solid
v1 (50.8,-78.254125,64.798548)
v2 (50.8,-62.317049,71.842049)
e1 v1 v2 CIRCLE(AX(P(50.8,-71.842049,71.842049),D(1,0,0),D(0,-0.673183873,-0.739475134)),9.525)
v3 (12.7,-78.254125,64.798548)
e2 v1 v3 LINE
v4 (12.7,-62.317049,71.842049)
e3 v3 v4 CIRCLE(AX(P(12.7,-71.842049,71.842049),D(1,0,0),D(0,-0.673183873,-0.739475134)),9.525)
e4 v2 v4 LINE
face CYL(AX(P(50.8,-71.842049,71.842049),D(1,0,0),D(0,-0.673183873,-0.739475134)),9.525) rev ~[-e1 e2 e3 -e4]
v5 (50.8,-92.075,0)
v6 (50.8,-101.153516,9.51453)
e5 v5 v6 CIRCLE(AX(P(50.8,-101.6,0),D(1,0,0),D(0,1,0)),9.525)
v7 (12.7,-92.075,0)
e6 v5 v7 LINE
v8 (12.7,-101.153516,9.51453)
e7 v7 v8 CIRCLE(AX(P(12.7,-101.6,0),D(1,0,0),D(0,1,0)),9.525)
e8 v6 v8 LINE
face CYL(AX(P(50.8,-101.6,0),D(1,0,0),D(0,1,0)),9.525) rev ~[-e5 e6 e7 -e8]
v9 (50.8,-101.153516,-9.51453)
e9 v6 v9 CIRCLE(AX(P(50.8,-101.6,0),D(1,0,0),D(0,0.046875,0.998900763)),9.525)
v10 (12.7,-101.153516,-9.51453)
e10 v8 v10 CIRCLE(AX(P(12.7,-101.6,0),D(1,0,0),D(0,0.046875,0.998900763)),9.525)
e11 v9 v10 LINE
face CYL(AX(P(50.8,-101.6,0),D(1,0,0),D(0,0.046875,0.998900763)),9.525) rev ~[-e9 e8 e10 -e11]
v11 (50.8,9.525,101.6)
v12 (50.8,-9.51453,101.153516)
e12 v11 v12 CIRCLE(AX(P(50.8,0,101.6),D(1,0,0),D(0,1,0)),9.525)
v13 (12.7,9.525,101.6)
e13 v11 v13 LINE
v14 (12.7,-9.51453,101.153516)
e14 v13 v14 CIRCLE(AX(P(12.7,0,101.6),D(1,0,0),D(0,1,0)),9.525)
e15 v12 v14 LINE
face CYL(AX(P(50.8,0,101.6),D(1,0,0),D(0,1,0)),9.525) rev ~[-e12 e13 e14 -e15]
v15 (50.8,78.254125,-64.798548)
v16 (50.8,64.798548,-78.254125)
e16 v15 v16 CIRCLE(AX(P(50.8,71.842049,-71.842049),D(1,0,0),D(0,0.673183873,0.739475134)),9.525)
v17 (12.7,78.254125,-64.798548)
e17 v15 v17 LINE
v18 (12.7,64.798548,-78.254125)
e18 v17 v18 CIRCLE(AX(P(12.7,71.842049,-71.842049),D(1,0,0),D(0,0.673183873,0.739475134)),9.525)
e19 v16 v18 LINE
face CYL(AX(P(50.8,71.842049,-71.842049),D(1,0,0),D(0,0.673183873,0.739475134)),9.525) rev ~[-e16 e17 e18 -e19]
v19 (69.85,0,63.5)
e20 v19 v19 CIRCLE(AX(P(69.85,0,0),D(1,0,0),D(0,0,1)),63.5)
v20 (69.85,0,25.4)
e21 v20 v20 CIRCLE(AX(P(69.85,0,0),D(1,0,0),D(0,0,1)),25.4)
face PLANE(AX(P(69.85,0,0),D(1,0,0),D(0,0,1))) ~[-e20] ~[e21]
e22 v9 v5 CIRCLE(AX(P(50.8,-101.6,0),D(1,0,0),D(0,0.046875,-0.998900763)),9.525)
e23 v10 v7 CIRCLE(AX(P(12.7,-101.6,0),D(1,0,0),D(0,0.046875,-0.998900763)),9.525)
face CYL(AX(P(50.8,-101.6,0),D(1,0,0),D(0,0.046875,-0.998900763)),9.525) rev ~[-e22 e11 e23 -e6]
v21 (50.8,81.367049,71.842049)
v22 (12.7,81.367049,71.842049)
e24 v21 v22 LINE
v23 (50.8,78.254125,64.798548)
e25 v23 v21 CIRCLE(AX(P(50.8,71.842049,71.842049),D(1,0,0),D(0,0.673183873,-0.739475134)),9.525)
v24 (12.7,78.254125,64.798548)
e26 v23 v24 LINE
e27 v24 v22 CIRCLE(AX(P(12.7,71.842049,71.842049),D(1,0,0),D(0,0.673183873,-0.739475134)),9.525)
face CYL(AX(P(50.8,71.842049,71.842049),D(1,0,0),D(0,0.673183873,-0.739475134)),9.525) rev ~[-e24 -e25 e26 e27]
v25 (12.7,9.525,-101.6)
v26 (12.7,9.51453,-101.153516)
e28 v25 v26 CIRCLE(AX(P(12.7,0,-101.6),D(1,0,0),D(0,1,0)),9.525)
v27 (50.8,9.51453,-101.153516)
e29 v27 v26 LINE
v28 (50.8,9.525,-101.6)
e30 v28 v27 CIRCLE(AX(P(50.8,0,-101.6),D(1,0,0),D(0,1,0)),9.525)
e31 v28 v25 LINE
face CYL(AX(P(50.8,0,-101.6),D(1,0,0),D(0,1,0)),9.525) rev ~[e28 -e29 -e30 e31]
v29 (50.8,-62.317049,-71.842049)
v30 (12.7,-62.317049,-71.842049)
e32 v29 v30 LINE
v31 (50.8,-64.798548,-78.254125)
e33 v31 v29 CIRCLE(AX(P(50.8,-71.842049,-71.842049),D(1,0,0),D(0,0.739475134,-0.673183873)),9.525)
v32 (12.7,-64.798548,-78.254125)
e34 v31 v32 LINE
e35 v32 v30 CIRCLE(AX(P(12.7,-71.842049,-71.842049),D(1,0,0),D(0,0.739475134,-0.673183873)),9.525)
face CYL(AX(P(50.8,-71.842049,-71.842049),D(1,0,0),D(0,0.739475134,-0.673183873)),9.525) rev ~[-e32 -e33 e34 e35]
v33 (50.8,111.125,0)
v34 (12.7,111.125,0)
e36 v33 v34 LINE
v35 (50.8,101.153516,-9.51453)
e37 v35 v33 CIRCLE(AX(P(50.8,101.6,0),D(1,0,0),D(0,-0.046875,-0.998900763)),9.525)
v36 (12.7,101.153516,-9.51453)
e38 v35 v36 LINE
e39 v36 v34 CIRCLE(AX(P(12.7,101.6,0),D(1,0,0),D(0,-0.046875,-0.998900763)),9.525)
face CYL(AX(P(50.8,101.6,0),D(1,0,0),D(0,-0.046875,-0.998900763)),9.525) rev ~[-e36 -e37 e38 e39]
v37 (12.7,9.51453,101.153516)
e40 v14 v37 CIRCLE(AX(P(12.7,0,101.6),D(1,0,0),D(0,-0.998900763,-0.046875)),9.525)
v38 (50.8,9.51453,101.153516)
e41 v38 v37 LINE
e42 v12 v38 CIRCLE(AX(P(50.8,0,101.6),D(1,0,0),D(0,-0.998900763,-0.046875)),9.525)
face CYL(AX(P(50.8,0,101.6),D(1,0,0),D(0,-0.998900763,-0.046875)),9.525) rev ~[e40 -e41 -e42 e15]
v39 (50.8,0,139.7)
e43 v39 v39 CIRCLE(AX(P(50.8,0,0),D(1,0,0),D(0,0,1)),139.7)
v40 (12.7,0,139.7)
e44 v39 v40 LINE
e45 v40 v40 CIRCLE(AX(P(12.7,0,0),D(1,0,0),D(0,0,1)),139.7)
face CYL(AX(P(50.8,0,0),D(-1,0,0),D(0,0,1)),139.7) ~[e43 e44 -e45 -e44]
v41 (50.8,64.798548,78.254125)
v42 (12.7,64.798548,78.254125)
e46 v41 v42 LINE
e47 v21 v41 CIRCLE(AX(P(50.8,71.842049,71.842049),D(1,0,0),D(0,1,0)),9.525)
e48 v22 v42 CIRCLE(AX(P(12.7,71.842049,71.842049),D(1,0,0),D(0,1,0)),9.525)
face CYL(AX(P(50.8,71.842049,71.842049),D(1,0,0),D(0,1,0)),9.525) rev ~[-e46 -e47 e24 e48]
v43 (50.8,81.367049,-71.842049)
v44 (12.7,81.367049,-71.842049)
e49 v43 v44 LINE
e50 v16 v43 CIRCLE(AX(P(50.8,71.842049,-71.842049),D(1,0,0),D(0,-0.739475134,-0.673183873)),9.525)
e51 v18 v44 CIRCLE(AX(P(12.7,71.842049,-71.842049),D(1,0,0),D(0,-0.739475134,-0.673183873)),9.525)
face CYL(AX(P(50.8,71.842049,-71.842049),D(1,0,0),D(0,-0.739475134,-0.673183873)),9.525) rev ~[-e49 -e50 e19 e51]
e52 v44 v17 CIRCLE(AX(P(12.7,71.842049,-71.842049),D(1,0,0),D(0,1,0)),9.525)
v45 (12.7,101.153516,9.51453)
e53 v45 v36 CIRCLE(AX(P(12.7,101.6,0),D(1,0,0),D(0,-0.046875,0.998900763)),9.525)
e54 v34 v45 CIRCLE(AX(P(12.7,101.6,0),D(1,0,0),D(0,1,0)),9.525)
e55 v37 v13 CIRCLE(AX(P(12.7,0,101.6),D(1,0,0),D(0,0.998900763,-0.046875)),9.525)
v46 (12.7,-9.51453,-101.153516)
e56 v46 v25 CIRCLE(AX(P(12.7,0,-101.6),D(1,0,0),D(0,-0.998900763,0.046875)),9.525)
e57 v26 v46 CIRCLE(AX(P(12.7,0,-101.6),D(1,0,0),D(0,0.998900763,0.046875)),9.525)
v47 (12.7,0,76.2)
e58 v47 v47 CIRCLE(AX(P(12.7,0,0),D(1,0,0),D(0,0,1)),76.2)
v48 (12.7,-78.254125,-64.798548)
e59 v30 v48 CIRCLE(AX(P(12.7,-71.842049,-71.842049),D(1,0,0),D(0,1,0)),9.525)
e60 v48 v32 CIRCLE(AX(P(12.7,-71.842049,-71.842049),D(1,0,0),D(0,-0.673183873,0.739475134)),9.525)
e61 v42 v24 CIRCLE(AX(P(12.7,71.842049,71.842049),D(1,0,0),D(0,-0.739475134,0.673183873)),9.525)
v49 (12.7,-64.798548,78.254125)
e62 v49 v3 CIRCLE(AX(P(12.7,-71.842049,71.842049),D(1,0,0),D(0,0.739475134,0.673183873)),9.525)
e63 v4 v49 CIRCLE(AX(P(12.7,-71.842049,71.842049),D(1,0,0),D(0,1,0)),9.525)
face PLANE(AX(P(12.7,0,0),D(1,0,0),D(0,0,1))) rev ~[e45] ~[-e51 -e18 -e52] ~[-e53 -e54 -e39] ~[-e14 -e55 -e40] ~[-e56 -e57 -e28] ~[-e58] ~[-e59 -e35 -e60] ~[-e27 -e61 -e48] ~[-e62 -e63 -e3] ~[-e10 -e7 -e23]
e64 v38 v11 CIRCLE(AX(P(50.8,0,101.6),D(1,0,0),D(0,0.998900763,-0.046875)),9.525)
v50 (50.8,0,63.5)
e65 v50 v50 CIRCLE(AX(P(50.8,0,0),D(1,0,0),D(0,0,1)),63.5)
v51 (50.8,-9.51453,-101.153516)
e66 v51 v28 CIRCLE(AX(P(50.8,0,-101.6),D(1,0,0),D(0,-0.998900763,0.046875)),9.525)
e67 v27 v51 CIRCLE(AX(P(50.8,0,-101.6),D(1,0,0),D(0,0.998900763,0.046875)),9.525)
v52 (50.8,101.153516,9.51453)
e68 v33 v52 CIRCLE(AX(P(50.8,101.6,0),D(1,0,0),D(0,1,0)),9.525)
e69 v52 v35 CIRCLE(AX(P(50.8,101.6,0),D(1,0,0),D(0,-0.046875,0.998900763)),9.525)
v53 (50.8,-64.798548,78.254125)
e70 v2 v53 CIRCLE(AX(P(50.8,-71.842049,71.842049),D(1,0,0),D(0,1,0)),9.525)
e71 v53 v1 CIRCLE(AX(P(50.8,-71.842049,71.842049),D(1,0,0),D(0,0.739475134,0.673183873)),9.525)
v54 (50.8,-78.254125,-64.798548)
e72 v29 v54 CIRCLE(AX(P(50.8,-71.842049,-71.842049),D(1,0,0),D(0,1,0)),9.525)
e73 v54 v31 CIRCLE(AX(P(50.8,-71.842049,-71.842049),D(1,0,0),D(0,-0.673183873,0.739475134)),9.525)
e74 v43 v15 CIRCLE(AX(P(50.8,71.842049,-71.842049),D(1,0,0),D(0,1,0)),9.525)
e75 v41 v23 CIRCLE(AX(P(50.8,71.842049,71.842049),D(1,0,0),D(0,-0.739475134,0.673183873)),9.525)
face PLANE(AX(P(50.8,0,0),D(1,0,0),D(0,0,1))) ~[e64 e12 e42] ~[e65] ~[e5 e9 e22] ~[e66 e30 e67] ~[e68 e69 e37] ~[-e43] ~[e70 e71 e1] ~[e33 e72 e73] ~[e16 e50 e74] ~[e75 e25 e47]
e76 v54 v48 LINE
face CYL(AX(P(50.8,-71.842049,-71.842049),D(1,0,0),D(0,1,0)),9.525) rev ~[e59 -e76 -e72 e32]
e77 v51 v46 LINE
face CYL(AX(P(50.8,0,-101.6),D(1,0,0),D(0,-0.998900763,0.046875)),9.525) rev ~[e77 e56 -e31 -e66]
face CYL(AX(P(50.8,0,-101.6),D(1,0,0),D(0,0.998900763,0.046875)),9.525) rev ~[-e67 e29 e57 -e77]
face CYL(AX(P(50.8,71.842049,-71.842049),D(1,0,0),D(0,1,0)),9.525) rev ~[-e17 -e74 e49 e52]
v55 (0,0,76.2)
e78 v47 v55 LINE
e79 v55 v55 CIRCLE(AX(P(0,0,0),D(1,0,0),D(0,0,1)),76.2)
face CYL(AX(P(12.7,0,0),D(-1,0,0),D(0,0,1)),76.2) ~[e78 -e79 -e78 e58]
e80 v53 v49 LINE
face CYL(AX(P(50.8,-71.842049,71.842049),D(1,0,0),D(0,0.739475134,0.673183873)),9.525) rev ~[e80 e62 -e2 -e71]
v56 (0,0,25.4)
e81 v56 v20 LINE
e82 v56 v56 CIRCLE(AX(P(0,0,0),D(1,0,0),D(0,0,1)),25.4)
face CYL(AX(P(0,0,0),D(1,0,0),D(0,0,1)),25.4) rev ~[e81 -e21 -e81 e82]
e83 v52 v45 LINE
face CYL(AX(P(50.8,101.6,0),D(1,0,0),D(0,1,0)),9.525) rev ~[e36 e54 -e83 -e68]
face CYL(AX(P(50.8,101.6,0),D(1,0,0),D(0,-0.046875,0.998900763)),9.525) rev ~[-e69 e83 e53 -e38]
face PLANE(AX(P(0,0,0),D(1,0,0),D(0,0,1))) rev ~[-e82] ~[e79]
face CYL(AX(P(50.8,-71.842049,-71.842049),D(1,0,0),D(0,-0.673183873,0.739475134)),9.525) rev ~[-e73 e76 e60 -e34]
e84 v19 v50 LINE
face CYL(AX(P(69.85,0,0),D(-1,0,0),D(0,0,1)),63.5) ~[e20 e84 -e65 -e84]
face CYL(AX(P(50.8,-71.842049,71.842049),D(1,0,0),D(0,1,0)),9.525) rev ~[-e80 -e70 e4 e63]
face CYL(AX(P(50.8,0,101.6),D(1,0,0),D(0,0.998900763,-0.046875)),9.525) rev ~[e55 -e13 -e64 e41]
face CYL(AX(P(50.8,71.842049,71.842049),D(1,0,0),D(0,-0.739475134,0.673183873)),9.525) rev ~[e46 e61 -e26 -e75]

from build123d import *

# Parameters (mm, degrees)
F3_DEPTH = 50.801


with BuildPart() as f1:
    # F0 (on Front) → F1 (revolve)
    with BuildSketch(Plane.XZ):
        Polygon((0, 76.2), (0, 25.4), (69.85, 25.4), (69.85, 63.5), (50.8, 63.5), (50.8, 139.7), (12.7, 139.7), (12.7, 76.2), align=None)
    revolve(axis=Axis((-2.3766048754, 0, 0), (1, 0, 0)))

    # F2 (on face) → F3 (cut, through all)
    with BuildSketch(Plane.YZ.offset(50.8)):
        with BuildLine():
            ThreePointArc((9.5145297678, 101.153515625), (0, 101.6), (-9.5145297678, 101.153515625))
            ThreePointArc((-9.5145297678, 101.153515625), (0, 92.075), (9.5145297678, 101.153515625))
        make_face()
        with BuildLine():
            ThreePointArc((9.5145297678, 101.153515625), (9.5223820822, 101.3766964382), (9.525, 101.6))
            ThreePointArc((9.525, 101.6), (-0.2233035618, 111.1223820822), (-9.5145297678, 101.153515625))
            ThreePointArc((-9.5145297678, 101.153515625), (0, 101.6), (9.5145297678, 101.153515625))
        make_face()
        with BuildLine():
            ThreePointArc((-62.3170489686, 71.8420489686), (-62.9590604886, 75.2798012378), (-64.7985483207, 78.2541253579))
            ThreePointArc((-64.7985483207, 78.2541253579), (-71.8420489686, 71.8420489686), (-78.2541253579, 64.7985483207))
            ThreePointArc((-78.2541253579, 64.7985483207), (-67.9916855187, 63.1299696356), (-62.3170489686, 71.8420489686))
        make_face()
        with BuildLine():
            ThreePointArc((-78.2541253579, 64.7985483207), (-71.8420489686, 71.8420489686), (-64.7985483207, 78.2541253579))
            ThreePointArc((-64.7985483207, 78.2541253579), (-78.5772410594, 78.5772410594), (-78.2541253579, 64.7985483207))
        make_face()
        with BuildLine():
            ThreePointArc((-92.075, 0), (-94.7087595938, 6.5754414805), (-101.153515625, 9.5145297678))
            ThreePointArc((-101.153515625, 9.5145297678), (-101.6, 0), (-101.153515625, -9.5145297678))
            ThreePointArc((-101.153515625, -9.5145297678), (-94.7087595938, -6.5754414805), (-92.075, 0))
        make_face()
        with BuildLine():
            ThreePointArc((-101.153515625, -9.5145297678), (-101.6, 0), (-101.153515625, 9.5145297678))
            ThreePointArc((-101.153515625, 9.5145297678), (-111.125, 0), (-101.153515625, -9.5145297678))
        make_face()
        with BuildLine():
            ThreePointArc((-64.7985483207, -78.2541253579), (-71.8420489686, -71.8420489686), (-78.2541253579, -64.7985483207))
            ThreePointArc((-78.2541253579, -64.7985483207), (-78.5772410594, -78.5772410594), (-64.7985483207, -78.2541253579))
        make_face()
        with BuildLine():
            ThreePointArc((-62.3170489686, -71.8420489686), (-67.9916855187, -63.1299696356), (-78.2541253579, -64.7985483207))
            ThreePointArc((-78.2541253579, -64.7985483207), (-71.8420489686, -71.8420489686), (-64.7985483207, -78.2541253579))
            ThreePointArc((-64.7985483207, -78.2541253579), (-62.9590604886, -75.2798012378), (-62.3170489686, -71.8420489686))
        make_face()
        with BuildLine():
            ThreePointArc((9.5145297678, -101.153515625), (0, -92.075), (-9.5145297678, -101.153515625))
            ThreePointArc((-9.5145297678, -101.153515625), (0, -101.6), (9.5145297678, -101.153515625))
        make_face()
        with BuildLine():
            ThreePointArc((9.5145297678, -101.153515625), (0, -101.6), (-9.5145297678, -101.153515625))
            ThreePointArc((-9.5145297678, -101.153515625), (-0.2233035618, -111.1223820822), (9.525, -101.6))
            ThreePointArc((9.525, -101.6), (9.5223820822, -101.3766964382), (9.5145297678, -101.153515625))
        make_face()
        with BuildLine():
            ThreePointArc((81.3670489686, -71.8420489686), (80.5541283015, -67.9916855187), (78.2541253579, -64.7985483207))
            ThreePointArc((78.2541253579, -64.7985483207), (71.8420489686, -71.8420489686), (64.7985483207, -78.2541253579))
            ThreePointArc((64.7985483207, -78.2541253579), (75.2798012378, -80.7250374485), (81.3670489686, -71.8420489686))
        make_face()
        with BuildLine():
            ThreePointArc((64.7985483207, -78.2541253579), (71.8420489686, -71.8420489686), (78.2541253579, -64.7985483207))
            ThreePointArc((78.2541253579, -64.7985483207), (65.1068568778, -65.1068568778), (64.7985483207, -78.2541253579))
        make_face()
        with BuildLine():
            ThreePointArc((101.6, 0), (101.4883175235, 4.7625), (101.153515625, 9.5145297678))
            ThreePointArc((101.153515625, 9.5145297678), (92.075, 0), (101.153515625, -9.5145297678))
            ThreePointArc((101.153515625, -9.5145297678), (101.4883175235, -4.7625), (101.6, 0))
        make_face()
        with BuildLine():
            ThreePointArc((111.125, 0), (108.1754414805, 6.8912404062), (101.153515625, 9.5145297678))
            ThreePointArc((101.153515625, 9.5145297678), (101.4883175235, 4.7625), (101.6, 0))
            ThreePointArc((101.6, 0), (101.4883175235, -4.7625), (101.153515625, -9.5145297678))
            ThreePointArc((101.153515625, -9.5145297678), (108.1754414805, -6.8912404062), (111.125, 0))
        make_face()
        with BuildLine():
            ThreePointArc((81.3670489686, 71.8420489686), (75.2798012378, 80.7250374485), (64.7985483207, 78.2541253579))
            ThreePointArc((64.7985483207, 78.2541253579), (71.8420489686, 71.8420489686), (78.2541253579, 64.7985483207))
            ThreePointArc((78.2541253579, 64.7985483207), (80.5541283015, 67.9916855187), (81.3670489686, 71.8420489686))
        make_face()
        with BuildLine():
            ThreePointArc((78.2541253579, 64.7985483207), (71.8420489686, 71.8420489686), (64.7985483207, 78.2541253579))
            ThreePointArc((64.7985483207, 78.2541253579), (65.1068568778, 65.1068568778), (78.2541253579, 64.7985483207))
        make_face()
    extrude(amount=-F3_DEPTH, mode=Mode.SUBTRACT)


solid = f1.part
